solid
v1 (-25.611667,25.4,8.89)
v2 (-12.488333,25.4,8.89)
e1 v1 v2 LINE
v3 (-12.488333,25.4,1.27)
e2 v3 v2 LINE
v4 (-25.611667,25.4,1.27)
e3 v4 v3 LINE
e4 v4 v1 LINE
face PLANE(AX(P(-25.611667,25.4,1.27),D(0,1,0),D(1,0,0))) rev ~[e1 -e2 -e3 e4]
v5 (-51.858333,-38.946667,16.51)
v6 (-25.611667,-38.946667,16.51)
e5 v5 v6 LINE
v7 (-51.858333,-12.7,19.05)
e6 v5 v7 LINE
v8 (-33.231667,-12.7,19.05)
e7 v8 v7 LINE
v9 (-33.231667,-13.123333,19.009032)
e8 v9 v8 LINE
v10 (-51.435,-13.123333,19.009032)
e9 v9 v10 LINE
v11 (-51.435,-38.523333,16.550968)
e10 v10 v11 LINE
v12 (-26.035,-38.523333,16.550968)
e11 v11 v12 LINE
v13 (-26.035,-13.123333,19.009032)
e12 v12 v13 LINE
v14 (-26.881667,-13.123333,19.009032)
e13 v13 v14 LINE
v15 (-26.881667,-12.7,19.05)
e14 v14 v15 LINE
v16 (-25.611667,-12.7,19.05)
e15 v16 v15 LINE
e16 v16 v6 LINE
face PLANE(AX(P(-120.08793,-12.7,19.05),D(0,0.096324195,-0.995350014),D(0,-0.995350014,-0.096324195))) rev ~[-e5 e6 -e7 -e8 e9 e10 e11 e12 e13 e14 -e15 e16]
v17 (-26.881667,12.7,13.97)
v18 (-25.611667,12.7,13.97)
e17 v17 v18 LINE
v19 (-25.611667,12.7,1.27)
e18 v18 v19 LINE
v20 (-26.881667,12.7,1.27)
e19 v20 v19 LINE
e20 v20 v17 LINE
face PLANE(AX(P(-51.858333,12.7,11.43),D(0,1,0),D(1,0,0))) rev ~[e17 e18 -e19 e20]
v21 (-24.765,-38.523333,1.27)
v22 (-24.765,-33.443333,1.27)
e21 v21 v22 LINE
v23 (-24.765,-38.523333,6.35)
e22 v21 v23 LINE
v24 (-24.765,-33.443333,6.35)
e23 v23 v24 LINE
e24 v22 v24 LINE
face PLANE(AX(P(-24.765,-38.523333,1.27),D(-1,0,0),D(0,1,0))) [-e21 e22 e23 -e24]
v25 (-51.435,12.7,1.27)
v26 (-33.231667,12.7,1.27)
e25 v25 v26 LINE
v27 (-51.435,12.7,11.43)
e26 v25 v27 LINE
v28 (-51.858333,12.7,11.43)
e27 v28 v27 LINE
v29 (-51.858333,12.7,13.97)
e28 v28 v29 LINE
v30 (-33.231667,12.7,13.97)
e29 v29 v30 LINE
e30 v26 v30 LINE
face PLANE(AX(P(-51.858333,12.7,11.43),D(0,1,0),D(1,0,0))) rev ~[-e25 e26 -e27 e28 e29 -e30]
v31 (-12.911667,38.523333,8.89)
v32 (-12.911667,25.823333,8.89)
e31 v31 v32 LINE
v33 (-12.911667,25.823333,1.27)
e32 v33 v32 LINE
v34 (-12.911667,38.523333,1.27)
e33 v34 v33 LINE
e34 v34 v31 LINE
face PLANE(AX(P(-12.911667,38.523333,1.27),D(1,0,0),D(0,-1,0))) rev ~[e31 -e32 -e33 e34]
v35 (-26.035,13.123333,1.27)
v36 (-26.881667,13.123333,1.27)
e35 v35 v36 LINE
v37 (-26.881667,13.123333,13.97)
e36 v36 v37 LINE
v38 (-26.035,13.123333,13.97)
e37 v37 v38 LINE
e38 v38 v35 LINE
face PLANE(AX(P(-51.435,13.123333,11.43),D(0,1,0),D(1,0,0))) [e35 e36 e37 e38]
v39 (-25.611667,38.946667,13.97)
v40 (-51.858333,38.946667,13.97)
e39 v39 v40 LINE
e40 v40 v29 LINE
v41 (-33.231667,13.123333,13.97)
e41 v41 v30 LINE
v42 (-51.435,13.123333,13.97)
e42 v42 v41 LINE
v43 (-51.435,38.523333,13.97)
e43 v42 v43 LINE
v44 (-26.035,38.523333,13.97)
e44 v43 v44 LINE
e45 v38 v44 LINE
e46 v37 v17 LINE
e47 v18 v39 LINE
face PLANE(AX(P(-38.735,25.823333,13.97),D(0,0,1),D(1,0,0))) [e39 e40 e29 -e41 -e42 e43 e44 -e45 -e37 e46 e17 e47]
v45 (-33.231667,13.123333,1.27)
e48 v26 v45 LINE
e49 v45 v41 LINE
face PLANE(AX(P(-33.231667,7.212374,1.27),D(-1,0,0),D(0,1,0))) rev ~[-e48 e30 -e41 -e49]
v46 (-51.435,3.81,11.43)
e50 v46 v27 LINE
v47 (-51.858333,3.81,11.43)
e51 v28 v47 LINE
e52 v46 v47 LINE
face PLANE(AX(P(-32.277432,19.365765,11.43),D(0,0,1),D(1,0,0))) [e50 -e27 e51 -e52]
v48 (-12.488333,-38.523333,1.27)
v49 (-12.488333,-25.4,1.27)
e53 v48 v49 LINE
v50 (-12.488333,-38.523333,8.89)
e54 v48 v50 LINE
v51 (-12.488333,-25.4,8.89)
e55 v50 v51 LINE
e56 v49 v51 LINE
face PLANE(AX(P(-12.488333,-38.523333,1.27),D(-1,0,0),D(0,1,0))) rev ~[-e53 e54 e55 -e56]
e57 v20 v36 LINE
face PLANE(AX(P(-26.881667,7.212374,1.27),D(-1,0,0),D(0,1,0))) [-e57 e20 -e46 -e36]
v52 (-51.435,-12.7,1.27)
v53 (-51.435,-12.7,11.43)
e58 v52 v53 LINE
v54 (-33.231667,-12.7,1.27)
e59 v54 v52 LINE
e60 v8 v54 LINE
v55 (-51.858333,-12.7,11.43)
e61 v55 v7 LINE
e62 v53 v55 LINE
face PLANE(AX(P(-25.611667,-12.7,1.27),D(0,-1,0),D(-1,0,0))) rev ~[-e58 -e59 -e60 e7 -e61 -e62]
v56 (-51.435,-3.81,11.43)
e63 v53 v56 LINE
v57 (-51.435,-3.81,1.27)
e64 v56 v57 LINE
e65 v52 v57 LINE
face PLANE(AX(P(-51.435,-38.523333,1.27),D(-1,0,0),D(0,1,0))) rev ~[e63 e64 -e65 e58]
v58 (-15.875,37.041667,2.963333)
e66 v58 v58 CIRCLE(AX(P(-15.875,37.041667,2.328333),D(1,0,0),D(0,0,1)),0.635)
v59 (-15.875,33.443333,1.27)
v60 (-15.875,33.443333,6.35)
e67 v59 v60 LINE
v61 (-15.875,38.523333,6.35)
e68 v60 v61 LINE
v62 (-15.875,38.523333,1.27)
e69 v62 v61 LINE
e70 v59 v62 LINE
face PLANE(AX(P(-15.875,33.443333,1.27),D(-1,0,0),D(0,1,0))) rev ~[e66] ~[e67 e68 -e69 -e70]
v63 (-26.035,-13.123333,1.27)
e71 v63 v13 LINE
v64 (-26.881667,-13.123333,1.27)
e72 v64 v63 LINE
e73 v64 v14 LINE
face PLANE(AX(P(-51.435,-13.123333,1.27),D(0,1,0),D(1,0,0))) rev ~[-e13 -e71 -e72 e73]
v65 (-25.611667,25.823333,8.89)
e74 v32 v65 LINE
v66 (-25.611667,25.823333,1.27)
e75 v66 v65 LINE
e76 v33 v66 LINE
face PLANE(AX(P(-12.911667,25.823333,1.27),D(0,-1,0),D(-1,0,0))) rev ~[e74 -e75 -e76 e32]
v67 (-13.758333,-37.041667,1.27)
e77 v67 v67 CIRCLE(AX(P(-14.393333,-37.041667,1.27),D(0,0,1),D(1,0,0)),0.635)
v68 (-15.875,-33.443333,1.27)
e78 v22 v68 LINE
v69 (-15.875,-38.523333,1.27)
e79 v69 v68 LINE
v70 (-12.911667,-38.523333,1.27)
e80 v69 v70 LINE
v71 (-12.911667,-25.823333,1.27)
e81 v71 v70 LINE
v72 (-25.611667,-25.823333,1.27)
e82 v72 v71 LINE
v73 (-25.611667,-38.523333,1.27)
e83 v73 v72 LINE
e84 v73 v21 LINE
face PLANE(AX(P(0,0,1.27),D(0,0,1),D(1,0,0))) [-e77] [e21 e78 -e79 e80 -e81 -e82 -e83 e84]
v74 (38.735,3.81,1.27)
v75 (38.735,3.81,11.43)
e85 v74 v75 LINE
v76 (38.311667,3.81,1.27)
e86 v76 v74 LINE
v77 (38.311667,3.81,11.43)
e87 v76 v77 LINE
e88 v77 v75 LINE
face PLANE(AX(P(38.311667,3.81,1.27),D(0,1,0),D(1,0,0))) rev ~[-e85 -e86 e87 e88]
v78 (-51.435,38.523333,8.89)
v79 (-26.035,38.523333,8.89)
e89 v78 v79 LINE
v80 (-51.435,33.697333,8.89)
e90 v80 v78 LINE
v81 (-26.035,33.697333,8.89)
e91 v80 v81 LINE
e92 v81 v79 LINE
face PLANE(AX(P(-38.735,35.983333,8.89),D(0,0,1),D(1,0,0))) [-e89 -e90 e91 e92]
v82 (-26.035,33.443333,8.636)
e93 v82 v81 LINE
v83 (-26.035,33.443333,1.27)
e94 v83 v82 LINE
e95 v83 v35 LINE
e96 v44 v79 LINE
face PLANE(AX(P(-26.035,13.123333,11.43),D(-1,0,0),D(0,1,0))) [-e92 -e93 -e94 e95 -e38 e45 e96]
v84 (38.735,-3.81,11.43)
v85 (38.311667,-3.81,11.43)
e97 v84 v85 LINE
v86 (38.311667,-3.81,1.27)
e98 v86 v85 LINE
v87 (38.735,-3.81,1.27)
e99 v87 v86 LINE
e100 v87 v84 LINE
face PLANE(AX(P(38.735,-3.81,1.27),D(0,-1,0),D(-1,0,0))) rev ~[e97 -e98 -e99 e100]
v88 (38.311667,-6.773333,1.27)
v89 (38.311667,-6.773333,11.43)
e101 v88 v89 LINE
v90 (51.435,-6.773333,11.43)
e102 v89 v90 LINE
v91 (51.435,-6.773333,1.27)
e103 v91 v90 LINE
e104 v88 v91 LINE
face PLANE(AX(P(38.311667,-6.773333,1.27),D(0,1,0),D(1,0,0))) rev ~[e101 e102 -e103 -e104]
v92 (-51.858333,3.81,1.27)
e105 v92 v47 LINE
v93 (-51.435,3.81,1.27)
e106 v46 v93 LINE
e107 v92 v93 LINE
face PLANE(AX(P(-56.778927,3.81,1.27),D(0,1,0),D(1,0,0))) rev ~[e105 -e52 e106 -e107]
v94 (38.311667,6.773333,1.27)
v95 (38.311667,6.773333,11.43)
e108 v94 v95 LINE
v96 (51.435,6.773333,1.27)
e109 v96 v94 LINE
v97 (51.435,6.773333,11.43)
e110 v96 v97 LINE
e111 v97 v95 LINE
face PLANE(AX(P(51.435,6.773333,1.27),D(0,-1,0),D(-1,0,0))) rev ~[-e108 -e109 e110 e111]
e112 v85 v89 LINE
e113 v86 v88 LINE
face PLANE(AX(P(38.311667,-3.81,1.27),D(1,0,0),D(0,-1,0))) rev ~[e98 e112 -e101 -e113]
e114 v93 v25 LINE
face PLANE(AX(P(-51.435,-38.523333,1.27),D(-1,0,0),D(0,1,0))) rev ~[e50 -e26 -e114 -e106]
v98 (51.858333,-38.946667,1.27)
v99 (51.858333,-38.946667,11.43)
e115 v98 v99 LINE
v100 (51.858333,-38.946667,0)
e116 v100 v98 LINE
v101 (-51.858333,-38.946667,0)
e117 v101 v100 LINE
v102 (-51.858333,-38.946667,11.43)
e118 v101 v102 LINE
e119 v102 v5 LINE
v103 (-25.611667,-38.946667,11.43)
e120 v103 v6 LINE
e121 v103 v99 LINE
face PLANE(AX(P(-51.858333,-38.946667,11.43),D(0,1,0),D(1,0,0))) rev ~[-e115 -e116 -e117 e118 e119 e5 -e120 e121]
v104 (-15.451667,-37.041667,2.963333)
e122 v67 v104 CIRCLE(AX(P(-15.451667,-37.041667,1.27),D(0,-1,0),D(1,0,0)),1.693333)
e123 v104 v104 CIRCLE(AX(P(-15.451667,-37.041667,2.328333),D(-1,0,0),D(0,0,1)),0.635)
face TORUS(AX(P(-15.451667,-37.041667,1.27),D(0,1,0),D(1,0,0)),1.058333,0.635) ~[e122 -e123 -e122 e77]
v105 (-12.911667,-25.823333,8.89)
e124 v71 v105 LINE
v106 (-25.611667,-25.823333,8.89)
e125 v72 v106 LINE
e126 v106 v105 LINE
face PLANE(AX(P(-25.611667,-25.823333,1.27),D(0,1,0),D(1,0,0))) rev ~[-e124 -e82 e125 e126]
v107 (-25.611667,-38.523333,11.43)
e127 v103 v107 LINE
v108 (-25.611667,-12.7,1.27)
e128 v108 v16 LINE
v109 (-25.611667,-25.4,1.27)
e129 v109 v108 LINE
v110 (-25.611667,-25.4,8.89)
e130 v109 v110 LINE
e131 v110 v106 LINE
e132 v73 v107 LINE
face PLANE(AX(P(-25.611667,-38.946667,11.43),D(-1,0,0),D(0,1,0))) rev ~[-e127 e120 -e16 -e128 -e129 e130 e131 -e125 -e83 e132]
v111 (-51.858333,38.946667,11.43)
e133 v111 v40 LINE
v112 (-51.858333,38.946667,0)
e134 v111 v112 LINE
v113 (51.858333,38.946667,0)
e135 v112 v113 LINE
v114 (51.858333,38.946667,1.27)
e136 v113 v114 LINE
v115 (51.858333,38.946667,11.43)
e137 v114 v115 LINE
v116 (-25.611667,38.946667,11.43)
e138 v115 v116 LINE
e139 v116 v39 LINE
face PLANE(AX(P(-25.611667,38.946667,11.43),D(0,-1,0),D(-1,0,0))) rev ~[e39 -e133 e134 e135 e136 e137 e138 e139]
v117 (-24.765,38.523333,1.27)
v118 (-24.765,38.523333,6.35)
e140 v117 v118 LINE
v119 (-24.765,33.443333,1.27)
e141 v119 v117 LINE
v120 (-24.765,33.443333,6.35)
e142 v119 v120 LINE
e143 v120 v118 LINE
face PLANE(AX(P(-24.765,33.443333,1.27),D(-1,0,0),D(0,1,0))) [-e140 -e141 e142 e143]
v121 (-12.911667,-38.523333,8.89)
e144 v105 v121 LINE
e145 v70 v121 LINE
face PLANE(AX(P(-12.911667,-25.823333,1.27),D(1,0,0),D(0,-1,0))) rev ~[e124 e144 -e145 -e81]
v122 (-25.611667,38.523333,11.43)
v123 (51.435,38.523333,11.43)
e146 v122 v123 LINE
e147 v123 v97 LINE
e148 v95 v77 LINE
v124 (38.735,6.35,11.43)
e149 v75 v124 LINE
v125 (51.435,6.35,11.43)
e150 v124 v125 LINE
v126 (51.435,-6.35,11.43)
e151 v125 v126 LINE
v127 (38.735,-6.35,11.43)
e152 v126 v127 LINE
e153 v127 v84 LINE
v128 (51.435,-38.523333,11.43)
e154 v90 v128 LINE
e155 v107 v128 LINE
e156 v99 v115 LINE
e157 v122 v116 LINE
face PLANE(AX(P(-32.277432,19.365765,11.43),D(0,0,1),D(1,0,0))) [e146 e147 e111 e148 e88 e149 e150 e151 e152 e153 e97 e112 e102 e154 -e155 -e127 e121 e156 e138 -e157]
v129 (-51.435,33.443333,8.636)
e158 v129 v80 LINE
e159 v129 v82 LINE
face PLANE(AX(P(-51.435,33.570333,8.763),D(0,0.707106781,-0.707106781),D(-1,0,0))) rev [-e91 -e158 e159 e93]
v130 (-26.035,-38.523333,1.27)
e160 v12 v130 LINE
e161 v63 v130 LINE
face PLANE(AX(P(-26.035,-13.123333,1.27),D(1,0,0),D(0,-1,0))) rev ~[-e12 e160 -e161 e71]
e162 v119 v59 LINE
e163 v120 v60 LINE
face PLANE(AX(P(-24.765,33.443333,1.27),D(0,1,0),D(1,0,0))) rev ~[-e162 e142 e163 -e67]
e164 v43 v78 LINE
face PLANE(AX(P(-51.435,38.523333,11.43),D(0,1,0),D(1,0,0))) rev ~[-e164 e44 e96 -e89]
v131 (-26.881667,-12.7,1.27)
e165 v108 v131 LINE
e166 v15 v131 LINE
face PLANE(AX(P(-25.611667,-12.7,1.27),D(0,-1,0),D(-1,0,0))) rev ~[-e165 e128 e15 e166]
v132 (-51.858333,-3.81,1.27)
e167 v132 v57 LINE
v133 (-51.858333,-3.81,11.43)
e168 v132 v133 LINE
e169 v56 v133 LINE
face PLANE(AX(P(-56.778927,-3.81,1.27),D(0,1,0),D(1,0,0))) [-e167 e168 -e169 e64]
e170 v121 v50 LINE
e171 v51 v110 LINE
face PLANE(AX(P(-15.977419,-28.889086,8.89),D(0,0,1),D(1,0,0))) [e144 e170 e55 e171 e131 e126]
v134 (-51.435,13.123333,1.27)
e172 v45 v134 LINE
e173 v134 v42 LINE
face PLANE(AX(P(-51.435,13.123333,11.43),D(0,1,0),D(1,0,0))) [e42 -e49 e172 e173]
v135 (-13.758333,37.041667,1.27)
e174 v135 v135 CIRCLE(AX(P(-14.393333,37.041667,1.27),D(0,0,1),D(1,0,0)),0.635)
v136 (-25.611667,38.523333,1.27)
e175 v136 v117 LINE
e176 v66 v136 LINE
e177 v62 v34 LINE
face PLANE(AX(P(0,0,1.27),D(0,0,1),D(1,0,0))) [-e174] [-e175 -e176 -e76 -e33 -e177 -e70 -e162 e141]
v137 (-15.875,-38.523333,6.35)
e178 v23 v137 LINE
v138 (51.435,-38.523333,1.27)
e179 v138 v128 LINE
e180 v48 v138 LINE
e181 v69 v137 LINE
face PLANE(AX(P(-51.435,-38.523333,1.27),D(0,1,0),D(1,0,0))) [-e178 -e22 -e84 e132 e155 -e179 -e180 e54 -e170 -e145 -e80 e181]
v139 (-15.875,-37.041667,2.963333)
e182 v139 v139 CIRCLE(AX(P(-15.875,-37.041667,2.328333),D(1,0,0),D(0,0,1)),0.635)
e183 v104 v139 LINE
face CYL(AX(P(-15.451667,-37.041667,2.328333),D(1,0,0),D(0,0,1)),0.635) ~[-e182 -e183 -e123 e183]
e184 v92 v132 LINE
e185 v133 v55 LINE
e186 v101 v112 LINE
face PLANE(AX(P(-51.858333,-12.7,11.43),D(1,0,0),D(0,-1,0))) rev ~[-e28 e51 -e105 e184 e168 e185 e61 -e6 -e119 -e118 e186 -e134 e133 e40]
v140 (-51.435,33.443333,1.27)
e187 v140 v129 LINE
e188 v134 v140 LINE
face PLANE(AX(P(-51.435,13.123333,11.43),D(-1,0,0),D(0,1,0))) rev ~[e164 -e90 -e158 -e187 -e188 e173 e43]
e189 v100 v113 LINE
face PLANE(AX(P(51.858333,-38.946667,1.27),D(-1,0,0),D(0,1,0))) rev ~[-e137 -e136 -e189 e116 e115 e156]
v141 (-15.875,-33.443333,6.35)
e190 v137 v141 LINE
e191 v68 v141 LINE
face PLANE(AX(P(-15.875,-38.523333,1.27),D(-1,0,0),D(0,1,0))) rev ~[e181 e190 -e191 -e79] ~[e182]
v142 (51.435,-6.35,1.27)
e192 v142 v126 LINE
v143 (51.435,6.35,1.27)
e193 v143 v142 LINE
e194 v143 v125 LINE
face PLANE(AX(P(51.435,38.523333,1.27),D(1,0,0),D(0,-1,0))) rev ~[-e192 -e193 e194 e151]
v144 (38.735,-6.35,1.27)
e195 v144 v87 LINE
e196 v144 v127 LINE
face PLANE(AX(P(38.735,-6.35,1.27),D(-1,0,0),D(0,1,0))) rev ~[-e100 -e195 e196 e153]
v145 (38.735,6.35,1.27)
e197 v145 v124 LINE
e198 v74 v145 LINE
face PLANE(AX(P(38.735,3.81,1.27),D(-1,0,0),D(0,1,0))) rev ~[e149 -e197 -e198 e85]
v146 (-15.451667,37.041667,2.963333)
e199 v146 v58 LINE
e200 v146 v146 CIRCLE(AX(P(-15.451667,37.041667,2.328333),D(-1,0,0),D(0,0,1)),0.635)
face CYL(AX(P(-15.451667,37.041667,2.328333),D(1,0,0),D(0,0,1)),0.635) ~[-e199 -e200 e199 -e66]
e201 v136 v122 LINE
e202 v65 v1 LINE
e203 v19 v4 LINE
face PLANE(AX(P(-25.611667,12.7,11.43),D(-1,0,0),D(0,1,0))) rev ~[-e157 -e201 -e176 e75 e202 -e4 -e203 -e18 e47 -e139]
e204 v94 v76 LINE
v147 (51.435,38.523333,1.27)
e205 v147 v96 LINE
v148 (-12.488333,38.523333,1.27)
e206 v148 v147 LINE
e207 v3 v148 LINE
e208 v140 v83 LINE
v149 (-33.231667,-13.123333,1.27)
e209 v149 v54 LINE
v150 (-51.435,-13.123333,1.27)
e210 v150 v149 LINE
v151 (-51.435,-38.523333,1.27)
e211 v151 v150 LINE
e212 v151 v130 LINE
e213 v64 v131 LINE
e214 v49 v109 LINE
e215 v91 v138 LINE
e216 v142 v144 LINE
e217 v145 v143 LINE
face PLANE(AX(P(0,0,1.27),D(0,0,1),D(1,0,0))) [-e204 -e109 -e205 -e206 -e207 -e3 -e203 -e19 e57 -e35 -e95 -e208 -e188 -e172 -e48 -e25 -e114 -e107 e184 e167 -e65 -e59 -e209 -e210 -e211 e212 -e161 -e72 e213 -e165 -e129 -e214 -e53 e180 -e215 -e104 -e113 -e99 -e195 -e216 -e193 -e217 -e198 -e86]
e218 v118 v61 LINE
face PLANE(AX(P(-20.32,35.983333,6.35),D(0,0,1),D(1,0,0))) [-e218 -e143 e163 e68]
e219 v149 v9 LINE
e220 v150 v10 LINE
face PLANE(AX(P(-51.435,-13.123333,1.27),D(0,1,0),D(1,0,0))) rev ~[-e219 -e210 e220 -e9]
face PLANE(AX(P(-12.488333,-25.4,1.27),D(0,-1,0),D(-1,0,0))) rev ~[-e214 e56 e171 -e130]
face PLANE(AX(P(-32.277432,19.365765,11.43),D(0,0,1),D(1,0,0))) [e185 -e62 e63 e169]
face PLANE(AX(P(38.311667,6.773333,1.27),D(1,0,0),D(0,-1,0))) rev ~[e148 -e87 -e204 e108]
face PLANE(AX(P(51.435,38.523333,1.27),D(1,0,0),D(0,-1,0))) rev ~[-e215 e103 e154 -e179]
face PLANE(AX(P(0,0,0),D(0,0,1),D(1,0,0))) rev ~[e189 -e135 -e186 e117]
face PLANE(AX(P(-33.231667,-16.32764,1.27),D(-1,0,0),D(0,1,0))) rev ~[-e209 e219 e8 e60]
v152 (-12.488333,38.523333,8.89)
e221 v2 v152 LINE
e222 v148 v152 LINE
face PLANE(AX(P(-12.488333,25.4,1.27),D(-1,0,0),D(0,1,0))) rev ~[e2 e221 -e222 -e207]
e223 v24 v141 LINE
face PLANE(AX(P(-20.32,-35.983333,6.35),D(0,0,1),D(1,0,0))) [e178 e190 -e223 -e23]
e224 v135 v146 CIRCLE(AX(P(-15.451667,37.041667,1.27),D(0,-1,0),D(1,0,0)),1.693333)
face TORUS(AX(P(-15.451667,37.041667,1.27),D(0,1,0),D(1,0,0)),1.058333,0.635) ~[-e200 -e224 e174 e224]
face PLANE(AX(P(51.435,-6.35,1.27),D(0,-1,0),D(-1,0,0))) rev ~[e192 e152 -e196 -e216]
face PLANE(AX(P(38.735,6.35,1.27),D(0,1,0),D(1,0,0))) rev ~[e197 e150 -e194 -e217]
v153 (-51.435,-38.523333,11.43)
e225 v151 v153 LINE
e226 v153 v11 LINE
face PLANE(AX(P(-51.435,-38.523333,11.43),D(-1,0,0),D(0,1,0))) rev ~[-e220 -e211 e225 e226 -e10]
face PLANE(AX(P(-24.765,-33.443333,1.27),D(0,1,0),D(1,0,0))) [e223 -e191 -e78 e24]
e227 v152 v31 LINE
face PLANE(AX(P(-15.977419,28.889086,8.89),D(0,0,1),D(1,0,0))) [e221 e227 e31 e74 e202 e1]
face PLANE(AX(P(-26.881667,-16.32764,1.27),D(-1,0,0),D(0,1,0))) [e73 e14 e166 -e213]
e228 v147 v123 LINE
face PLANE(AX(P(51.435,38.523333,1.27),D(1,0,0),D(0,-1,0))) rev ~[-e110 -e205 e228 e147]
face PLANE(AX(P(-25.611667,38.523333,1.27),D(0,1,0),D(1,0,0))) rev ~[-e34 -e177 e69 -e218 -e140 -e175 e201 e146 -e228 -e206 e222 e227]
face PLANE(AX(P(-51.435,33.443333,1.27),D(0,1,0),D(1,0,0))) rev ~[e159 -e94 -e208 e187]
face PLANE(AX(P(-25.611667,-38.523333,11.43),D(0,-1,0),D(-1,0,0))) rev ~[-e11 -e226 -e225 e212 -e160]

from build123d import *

# Parameters (mm, degrees)
F0_W         = 103.7166666667
F0_H         = 77.8933333333
F1_DEPTH     = 1.27
F2_W         = 102.87
F2_H         = 0.4233333333
F2_W_2       = 0.4233333333
F3_DEPTH     = 10.16
F4_W         = 25.4
F4_H         = 25.4
F5_DEPTH     = 2.54
F6_W         = 25.4
F6_H         = 5.08
F7_DEPTH     = 7.62
F8_SIZE      = 0.254
F10_DEPTH    = 17.78
F12_DEPTH    = 7.62
F14_DEPTH    = 10.16
F15_T1_DEPTH = 162.7058608064
F16_W        = 11.0460426462
F16_H        = 7.62
F16_W_2      = 6.35
F16_H_2      = 7.8945169225
F16_H_3      = 7.643327117
F17_DEPTH    = 25.4
F19_DEPTH    = 7.62
F18_R        = 0.635
F20_ANGLE    = 90
F21_W        = 8.89
F21_H        = 5.08
F22_DEPTH    = 5.08
F23_DEPTH    = 2.54


# Not quite as in the source:
# - a fillet or chamfer that OpenCascade refuses, or shapes differently, is made with other operations: its cross-section is extruded or revolved along the edge and cut away or added


with BuildPart() as f1:
    # F0 (on Top) → F1 (new body)
    with BuildSketch(Plane.XY):
        Rectangle(F0_W, F0_H)
    extrude(amount=F1_DEPTH)

    # F2 (on face) → F3 (join)
    with BuildSketch(Plane.XY.offset(1.27)):
        Polygon((-25.6116666667, 38.5233333333), (-26.035, 38.5233333333), (-26.035, 13.1233333333), (-51.435, 13.1233333333), (-51.435, 12.7), (-25.6116666667, 12.7), align=None)
        Polygon((-51.435, 13.1233333333), (-51.435, 38.5233333333), (-26.035, 38.5233333333), (-25.6116666667, 38.5233333333), (38.6280342937, 38.5233333333), (51.435, 38.5233333333), (51.8583333333, 38.5233333333), (51.8583333333, 38.9466666667), (-51.8583333333, 38.9466666667), (-51.8583333333, -38.5233333333), (-51.435, -38.5233333333), (-51.435, -30.5099412799), (-51.435, 12.7), align=None)
        Polygon((51.8583333333, 38.5233333333), (51.435, 38.5233333333), (51.435, -38.5233333333), (51.435, -38.9466666667), (51.8583333333, -38.9466666667), align=None)
        with Locations((0, -38.735)):
            Rectangle(F2_W, F2_H)
        with Locations((-51.6466666667, -38.735)):
            Rectangle(F2_W_2, F2_H)
    extrude(amount=F3_DEPTH)

    # F4 (on face) → F5 (join)
    with BuildSketch(Plane.XY.offset(11.43)):
        Polygon((-25.6116666667, 12.7), (-25.6116666667, 38.5233333333), (-25.6116666667, 38.9466666667), (-51.8583333333, 38.9466666667), (-51.8583333333, 12.7), (-51.435, 12.7), align=None)
        with Locations((-38.735, 25.8233333333)):
            Rectangle(F4_W, F4_H, mode=Mode.SUBTRACT)
    extrude(amount=F5_DEPTH)

    # F6 (on face) → F7 (join)
    with BuildSketch(Plane.XY.offset(1.27)):
        with Locations((-38.735, 35.9833333333)):
            Rectangle(F6_W, F6_H)
    extrude(amount=F7_DEPTH)

    # F8
    f8_edges = [f1.edges().sort_by_distance(p)[0] for p in [
        (-38.735, 33.443333, 8.89),
    ]]
    chamfer(f8_edges, length=F8_SIZE)

    # F9 (on face) → F10 (join)
    with BuildSketch(Plane.XY.offset(1.27)):
        Polygon((-26.035, -13.1233333333), (-26.035, -38.5233333333), (-25.6116666667, -38.5233333333), (-25.6116666667, -12.7), (-51.435, -12.7), (-51.435, -13.1233333333), align=None)
    extrude(amount=F10_DEPTH)

    # F11 (on face) → F12 (join)
    with BuildSketch(Plane.XY.offset(11.43)):
        Polygon((-25.6116666667, -38.9466666667), (-25.6116666667, -38.5233333333), (-26.035, -38.5233333333), (-51.435, -38.5233333333), (-51.435, -13.1233333333), (-51.435, -12.7), (-51.8583333333, -12.7), (-51.8583333333, -38.9466666667), align=None)
    extrude(amount=F12_DEPTH)

    # F13 (on face) → F14 (join)
    with BuildSketch(Plane.XY.offset(1.27)):
        Polygon((51.435, -6.7733333333), (51.435, -6.35), (38.735, -6.35), (38.735, -3.81), (38.3116666667, -3.81), (38.3116666667, -6.7733333333), align=None)
        Polygon((38.735, 6.35), (51.435, 6.35), (51.435, 6.7733333333), (38.3116666667, 6.7733333333), (38.3116666667, 3.81), (38.735, 3.81), align=None)
    extrude(amount=F14_DEPTH)

    # F15: chamfer of 2.54 x 26.2466666667 on 1 edges, made by hand

    # F15_s2 → F15_t1 (cut)
    with BuildSketch(Plane.YZ.offset(-120.0879304032)):
        Polygon((-12.7, 19.05), (-38.9466666667, 16.51), (-38.9466666667, 19.05), align=None)
    extrude(amount=F15_T1_DEPTH, mode=Mode.SUBTRACT)

    # F16 (on face) → F17 (cut)
    with BuildSketch(Plane.XY.offset(1.27)):
        with Locations((-51.2559060007, 0)):
            Rectangle(F16_W, F16_H)
        with Locations((-30.0566666667, 11.1596328206)):
            Rectangle(F16_W_2, F16_H_2)
        with Locations((-30.0566666667, -12.5059764832)):
            Rectangle(F16_W_2, F16_H_3)
    extrude(amount=F17_DEPTH, mode=Mode.SUBTRACT)

    # F18 (on face) → F19 (join)
    with BuildSketch(Plane.XY.offset(1.27)):
        Polygon((-12.4883333333, 38.5233333333), (-12.9116666667, 38.5233333333), (-12.9116666667, 25.8233333333), (-25.6116666667, 25.8233333333), (-25.6116666667, 25.4), (-12.4883333333, 25.4), align=None)
        Polygon((-12.9116666667, -38.5233333333), (-12.4883333333, -38.5233333333), (-12.4883333333, -25.4), (-25.6116666667, -25.4), (-25.6116666667, -25.8233333333), (-12.9116666667, -25.8233333333), align=None)
    extrude(amount=F19_DEPTH)

    # F18 (on face) → F20 (revolve)
    with BuildSketch(Plane.XY.offset(1.27)):
        with Locations((-14.3933333333, 37.0416666667)):
            Circle(F18_R)
        with Locations((-14.3933333333, -37.0416666667)):
            Circle(F18_R)
    revolve(axis=Axis((-15.4516666667, 37.5929450293, 1.27), (0, -1, 0)), revolution_arc=F20_ANGLE)

    # F21 (on face) → F22 (join)
    with BuildSketch(Plane.XY.offset(1.27)):
        with Locations((-20.32, 35.9833333333)):
            Rectangle(F21_W, F21_H)
        with Locations((-20.32, -35.9833333333)):
            Rectangle(F21_W, F21_H)
    extrude(amount=F22_DEPTH)

    # F23 (add): faces of the model
    f23_faces = [f1.faces().sort_by_distance(p)[0] for p in [
        (-15.4516666667, 37.0416666667, 2.3283333333),
        (-15.4516666667, -37.0416666667, 2.3283333333),
    ]]
    extrude(f23_faces, amount=F23_DEPTH)


solid = f1.part
